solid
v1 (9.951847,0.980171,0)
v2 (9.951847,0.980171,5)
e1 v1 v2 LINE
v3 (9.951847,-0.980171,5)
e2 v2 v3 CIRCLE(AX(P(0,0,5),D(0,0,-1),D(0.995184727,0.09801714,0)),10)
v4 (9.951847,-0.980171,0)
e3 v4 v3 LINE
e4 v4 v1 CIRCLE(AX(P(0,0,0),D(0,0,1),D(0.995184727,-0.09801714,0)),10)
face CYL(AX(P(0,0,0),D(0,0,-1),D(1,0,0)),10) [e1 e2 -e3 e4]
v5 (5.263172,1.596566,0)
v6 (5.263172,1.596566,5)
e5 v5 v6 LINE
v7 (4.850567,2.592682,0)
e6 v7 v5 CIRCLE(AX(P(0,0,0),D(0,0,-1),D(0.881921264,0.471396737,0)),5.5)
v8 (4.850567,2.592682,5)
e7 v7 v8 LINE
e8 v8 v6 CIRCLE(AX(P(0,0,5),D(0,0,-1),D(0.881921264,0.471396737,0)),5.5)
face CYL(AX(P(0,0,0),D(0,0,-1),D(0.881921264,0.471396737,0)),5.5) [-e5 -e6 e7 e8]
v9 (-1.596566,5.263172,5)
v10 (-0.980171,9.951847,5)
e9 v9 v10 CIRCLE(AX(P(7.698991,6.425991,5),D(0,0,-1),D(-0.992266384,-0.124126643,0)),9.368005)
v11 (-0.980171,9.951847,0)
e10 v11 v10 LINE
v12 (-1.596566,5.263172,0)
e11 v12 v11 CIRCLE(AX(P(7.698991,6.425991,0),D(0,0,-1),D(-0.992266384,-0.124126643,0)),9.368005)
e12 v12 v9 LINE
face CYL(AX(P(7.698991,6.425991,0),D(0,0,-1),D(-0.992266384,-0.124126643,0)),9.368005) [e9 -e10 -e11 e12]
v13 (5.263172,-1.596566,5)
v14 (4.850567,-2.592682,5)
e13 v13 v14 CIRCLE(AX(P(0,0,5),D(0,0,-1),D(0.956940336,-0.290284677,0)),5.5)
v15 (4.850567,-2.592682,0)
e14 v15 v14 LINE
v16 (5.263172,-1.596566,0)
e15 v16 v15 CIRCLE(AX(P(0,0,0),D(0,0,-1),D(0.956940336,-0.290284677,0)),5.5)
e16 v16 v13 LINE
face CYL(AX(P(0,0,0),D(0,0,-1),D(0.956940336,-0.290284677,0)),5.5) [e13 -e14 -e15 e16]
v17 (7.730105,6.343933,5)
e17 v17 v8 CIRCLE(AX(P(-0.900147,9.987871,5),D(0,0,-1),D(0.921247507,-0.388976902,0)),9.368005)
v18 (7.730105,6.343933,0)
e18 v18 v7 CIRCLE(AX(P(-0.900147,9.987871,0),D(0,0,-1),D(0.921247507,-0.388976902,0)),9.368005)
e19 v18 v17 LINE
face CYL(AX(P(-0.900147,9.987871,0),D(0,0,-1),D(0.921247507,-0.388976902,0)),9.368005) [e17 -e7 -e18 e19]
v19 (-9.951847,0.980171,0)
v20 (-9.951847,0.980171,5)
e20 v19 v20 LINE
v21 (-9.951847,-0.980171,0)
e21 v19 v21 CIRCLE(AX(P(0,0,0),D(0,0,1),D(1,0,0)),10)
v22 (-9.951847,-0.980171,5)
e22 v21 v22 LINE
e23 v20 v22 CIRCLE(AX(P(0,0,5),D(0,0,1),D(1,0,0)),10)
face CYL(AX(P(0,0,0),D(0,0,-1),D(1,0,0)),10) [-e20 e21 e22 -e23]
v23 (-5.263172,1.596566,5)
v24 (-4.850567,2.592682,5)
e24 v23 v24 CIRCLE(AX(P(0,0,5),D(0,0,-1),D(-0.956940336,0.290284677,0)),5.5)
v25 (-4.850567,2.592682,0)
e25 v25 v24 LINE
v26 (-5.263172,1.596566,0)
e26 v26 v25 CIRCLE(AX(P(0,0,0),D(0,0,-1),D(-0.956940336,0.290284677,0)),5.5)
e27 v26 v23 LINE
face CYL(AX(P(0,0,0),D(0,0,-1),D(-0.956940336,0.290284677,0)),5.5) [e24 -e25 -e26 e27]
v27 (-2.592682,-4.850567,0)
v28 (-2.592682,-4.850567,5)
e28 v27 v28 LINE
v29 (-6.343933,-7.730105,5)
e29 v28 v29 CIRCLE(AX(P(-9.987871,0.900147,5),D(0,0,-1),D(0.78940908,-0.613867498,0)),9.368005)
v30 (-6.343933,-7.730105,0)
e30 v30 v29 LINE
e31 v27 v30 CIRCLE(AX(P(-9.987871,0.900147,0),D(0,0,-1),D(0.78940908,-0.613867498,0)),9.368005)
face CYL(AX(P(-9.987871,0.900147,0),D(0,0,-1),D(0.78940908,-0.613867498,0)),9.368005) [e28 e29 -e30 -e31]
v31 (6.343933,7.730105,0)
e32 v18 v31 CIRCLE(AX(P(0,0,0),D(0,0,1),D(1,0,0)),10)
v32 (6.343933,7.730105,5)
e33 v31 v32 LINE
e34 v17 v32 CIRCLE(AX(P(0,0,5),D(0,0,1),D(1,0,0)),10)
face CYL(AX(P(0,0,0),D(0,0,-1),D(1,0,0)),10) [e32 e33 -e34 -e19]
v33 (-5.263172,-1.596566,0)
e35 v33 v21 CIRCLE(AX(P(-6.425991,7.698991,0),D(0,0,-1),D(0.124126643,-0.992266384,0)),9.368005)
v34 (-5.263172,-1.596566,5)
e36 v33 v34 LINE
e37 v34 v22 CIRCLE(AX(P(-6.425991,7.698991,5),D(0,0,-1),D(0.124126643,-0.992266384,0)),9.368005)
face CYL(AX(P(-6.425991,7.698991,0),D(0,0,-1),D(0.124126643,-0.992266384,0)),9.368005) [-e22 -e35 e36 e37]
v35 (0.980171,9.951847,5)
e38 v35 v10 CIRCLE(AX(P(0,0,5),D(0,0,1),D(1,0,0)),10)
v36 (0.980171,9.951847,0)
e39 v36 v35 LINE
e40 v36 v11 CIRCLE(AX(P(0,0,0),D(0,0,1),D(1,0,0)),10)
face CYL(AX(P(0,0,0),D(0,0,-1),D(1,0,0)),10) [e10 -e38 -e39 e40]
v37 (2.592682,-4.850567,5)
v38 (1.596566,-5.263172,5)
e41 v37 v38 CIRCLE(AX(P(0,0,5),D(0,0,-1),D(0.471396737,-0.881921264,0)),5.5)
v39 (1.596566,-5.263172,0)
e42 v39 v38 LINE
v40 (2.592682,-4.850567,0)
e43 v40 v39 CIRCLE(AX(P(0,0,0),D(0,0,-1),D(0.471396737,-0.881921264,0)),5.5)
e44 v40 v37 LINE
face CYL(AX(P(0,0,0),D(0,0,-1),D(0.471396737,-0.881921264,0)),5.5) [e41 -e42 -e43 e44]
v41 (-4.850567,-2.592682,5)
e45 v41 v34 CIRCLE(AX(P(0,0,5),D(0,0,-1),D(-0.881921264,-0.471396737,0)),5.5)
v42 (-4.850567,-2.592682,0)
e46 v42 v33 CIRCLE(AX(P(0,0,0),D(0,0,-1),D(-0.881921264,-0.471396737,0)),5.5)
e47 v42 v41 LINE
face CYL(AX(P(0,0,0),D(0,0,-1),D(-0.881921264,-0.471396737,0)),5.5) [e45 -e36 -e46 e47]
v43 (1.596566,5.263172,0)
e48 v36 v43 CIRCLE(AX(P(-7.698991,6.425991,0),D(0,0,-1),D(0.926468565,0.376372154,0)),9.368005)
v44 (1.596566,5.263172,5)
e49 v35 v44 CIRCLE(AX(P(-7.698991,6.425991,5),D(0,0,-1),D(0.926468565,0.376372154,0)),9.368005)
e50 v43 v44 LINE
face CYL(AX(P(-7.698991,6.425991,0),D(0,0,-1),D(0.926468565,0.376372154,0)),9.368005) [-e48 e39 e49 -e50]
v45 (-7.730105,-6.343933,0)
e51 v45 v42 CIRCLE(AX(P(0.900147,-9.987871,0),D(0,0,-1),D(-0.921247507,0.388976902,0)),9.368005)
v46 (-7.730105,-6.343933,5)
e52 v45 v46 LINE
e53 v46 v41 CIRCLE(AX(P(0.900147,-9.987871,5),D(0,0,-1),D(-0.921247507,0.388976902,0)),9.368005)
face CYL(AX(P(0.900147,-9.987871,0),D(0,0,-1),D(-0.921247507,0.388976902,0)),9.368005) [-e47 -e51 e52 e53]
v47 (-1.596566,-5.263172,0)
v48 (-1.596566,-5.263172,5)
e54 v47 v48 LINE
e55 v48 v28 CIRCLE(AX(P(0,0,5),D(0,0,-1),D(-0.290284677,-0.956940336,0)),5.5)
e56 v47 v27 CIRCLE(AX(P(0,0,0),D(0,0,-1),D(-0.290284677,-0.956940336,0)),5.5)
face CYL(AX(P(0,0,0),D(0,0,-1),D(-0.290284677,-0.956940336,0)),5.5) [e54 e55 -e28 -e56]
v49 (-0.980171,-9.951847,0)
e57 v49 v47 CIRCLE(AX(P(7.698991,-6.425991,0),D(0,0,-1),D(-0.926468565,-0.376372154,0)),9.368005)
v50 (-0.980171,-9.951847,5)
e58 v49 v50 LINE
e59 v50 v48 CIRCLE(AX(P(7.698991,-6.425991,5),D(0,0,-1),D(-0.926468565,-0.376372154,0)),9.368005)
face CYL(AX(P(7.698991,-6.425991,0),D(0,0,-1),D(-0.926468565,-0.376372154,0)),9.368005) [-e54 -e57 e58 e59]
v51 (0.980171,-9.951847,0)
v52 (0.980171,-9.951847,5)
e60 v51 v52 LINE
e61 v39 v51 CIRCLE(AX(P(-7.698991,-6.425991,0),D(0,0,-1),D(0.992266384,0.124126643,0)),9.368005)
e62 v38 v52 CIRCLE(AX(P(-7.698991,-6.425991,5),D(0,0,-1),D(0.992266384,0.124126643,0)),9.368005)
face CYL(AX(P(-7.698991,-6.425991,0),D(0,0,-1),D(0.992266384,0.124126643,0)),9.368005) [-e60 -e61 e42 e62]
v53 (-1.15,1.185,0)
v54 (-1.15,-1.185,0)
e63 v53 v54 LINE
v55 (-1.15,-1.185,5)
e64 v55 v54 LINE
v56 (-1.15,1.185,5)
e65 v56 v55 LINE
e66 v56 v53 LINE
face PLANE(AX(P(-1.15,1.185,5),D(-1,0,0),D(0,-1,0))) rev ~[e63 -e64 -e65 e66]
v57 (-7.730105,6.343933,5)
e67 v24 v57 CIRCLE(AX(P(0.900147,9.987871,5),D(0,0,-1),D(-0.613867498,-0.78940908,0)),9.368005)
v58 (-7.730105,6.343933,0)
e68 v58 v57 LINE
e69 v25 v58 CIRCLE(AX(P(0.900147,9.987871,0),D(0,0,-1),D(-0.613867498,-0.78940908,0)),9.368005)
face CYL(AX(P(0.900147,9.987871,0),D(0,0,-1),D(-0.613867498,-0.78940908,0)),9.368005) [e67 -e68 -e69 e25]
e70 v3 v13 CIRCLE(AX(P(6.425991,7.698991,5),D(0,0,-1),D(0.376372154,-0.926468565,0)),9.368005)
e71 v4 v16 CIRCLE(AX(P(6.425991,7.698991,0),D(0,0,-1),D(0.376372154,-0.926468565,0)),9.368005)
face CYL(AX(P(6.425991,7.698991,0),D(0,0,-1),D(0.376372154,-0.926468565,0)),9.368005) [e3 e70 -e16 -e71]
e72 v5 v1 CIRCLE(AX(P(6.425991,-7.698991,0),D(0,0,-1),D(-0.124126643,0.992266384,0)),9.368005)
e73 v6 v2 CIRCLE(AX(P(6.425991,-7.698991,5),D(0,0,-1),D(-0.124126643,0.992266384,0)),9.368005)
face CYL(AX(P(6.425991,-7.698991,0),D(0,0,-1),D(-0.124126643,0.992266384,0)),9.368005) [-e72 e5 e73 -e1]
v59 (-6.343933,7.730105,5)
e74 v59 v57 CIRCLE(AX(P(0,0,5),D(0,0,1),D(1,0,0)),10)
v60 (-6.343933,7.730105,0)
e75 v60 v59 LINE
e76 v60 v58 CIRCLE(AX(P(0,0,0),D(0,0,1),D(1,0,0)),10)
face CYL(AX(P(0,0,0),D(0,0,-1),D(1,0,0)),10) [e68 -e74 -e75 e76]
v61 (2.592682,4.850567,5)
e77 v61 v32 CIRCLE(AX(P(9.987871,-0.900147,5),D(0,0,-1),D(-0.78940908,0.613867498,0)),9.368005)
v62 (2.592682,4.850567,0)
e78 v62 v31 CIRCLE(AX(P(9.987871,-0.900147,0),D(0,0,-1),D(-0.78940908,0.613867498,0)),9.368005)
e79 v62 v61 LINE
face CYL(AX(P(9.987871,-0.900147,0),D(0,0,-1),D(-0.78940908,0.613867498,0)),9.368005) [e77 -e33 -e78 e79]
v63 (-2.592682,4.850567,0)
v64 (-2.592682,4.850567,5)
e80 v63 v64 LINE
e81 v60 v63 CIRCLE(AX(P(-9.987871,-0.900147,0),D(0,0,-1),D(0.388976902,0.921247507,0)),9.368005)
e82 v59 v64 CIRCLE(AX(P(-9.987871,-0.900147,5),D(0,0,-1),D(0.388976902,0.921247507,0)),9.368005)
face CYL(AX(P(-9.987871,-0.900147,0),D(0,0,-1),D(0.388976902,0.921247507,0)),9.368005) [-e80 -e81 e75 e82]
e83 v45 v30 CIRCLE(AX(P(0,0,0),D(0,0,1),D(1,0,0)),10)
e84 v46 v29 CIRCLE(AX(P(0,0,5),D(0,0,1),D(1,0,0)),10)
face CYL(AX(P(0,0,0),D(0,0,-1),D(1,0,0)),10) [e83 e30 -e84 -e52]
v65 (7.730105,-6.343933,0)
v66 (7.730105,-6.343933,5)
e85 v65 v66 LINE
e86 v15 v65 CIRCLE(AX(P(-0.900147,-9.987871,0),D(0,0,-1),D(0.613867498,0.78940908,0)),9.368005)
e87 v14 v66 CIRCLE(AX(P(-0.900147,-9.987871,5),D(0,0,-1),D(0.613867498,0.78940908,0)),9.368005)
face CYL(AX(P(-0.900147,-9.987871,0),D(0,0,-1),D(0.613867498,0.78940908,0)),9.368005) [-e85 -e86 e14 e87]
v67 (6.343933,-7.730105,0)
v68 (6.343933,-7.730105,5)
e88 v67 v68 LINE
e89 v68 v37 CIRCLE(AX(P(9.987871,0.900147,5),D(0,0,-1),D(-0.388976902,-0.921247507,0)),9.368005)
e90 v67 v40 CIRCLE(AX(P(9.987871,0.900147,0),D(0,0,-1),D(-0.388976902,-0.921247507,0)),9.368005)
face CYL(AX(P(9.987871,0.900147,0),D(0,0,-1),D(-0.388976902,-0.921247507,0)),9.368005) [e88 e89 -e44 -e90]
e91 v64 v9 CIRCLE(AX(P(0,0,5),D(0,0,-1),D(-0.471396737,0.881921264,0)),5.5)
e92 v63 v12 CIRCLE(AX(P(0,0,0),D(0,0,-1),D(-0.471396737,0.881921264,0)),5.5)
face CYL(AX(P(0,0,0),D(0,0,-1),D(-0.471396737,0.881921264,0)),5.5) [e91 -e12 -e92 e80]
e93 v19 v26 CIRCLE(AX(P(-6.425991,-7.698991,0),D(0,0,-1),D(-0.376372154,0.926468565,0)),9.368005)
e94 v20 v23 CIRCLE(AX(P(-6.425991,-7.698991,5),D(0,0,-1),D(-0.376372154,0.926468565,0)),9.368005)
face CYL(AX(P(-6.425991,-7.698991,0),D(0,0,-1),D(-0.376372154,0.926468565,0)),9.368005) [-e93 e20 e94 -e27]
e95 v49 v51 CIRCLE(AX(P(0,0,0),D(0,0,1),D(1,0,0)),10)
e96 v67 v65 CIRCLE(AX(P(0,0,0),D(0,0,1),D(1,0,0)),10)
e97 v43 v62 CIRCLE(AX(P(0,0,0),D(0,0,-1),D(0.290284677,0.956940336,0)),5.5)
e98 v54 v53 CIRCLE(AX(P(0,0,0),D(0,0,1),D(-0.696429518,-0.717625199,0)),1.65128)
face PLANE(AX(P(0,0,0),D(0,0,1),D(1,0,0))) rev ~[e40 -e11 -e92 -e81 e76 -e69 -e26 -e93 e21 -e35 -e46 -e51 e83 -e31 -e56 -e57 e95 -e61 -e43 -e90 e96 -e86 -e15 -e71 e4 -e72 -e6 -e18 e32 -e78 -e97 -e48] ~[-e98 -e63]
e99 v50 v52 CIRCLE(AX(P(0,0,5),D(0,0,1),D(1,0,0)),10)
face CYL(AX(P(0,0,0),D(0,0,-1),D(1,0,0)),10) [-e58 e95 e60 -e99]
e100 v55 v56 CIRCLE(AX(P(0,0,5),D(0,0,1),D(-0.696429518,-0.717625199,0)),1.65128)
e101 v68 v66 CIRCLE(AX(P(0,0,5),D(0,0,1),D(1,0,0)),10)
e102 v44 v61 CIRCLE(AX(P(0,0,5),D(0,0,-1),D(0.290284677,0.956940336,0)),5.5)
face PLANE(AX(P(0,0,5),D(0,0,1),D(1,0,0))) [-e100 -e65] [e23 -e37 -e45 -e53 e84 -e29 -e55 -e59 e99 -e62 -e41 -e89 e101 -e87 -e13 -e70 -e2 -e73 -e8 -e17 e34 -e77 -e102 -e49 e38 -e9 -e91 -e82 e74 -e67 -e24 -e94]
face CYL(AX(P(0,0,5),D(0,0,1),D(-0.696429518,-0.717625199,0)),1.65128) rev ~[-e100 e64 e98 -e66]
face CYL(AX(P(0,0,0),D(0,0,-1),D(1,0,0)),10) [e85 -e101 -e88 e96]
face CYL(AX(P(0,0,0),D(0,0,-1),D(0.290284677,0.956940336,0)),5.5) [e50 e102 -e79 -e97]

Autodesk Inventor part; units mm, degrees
sketch "Sketch1" plane through (0, 0, 0) normal (0, 0, 1) x (1, 0, 0)
  circle A0 centre (0, 0) radius 10
  dimension "d0" = 20
extrude "Extrusion1" add sketch "Sketch1" along normal blind 5
ref_plane "Work Plane2" through (0, 0, 2.5) normal (0, 0, 1) x (1, 0, 0)
sketch "Sketch2" plane through (0, 0, 0) normal (0, 0, -1) x (-1, 0, 0)
  circle A0 centre (0, 0) radius 10 projected
  circle A1 centre (0, 0) radius 8
  dimension "d3" = 16
surface extrude "Pitch Diameter" sketch "Sketch2" against normal through all shown no curves A1
ref_plane "Work Plane8" through (0, 0, 0) normal (0.9238795, 0.3826834, 0) x (0, 0, 1)
ref_plane "Work Plane9" through (0, 0, 0) normal (1, 0, 0) x (0, 1, 0)
spur gear teeth "Spur Gear" teeth 8 pitch diameter 16 tip diameter 20 root diameter 11 face width 5 start plane through (0, 0, 0) normal (0, 0, -1) x (-1, 0, 0)
sketch "Sketch3" plane through (0, 0, 5) normal (0, 0, 1) x (1, 0, 0)
  line L0 (-1.15, 1.185) -> (-1.15, -1.185)
  arc A0 (-1.15, -1.185) -> (-1.15, 1.185) centre (0, 0) ccw
  point P0 (-1.15, 0)
  dimension "d49" = 2.37
  dimension "d50" = 1.15
extrude "Extrusion2" cut sketch "Sketch3" against normal through all
equation "\"d0\" = da_da"
equation "\"d1\" = da_b"
equation "\"d3\" = da_d"
equation "\"d16\" = da_aw"
equation "\"d43\" = da_aw"
equation "\"d46\" = da_aw"
equation "\"da_da\" = 20"
equation "\"da_b\" = 5"
equation "\"da_d\" = 16"
equation "\"da_aw\" = 108"
properties part number "Spur Gear1" material "Steel"
